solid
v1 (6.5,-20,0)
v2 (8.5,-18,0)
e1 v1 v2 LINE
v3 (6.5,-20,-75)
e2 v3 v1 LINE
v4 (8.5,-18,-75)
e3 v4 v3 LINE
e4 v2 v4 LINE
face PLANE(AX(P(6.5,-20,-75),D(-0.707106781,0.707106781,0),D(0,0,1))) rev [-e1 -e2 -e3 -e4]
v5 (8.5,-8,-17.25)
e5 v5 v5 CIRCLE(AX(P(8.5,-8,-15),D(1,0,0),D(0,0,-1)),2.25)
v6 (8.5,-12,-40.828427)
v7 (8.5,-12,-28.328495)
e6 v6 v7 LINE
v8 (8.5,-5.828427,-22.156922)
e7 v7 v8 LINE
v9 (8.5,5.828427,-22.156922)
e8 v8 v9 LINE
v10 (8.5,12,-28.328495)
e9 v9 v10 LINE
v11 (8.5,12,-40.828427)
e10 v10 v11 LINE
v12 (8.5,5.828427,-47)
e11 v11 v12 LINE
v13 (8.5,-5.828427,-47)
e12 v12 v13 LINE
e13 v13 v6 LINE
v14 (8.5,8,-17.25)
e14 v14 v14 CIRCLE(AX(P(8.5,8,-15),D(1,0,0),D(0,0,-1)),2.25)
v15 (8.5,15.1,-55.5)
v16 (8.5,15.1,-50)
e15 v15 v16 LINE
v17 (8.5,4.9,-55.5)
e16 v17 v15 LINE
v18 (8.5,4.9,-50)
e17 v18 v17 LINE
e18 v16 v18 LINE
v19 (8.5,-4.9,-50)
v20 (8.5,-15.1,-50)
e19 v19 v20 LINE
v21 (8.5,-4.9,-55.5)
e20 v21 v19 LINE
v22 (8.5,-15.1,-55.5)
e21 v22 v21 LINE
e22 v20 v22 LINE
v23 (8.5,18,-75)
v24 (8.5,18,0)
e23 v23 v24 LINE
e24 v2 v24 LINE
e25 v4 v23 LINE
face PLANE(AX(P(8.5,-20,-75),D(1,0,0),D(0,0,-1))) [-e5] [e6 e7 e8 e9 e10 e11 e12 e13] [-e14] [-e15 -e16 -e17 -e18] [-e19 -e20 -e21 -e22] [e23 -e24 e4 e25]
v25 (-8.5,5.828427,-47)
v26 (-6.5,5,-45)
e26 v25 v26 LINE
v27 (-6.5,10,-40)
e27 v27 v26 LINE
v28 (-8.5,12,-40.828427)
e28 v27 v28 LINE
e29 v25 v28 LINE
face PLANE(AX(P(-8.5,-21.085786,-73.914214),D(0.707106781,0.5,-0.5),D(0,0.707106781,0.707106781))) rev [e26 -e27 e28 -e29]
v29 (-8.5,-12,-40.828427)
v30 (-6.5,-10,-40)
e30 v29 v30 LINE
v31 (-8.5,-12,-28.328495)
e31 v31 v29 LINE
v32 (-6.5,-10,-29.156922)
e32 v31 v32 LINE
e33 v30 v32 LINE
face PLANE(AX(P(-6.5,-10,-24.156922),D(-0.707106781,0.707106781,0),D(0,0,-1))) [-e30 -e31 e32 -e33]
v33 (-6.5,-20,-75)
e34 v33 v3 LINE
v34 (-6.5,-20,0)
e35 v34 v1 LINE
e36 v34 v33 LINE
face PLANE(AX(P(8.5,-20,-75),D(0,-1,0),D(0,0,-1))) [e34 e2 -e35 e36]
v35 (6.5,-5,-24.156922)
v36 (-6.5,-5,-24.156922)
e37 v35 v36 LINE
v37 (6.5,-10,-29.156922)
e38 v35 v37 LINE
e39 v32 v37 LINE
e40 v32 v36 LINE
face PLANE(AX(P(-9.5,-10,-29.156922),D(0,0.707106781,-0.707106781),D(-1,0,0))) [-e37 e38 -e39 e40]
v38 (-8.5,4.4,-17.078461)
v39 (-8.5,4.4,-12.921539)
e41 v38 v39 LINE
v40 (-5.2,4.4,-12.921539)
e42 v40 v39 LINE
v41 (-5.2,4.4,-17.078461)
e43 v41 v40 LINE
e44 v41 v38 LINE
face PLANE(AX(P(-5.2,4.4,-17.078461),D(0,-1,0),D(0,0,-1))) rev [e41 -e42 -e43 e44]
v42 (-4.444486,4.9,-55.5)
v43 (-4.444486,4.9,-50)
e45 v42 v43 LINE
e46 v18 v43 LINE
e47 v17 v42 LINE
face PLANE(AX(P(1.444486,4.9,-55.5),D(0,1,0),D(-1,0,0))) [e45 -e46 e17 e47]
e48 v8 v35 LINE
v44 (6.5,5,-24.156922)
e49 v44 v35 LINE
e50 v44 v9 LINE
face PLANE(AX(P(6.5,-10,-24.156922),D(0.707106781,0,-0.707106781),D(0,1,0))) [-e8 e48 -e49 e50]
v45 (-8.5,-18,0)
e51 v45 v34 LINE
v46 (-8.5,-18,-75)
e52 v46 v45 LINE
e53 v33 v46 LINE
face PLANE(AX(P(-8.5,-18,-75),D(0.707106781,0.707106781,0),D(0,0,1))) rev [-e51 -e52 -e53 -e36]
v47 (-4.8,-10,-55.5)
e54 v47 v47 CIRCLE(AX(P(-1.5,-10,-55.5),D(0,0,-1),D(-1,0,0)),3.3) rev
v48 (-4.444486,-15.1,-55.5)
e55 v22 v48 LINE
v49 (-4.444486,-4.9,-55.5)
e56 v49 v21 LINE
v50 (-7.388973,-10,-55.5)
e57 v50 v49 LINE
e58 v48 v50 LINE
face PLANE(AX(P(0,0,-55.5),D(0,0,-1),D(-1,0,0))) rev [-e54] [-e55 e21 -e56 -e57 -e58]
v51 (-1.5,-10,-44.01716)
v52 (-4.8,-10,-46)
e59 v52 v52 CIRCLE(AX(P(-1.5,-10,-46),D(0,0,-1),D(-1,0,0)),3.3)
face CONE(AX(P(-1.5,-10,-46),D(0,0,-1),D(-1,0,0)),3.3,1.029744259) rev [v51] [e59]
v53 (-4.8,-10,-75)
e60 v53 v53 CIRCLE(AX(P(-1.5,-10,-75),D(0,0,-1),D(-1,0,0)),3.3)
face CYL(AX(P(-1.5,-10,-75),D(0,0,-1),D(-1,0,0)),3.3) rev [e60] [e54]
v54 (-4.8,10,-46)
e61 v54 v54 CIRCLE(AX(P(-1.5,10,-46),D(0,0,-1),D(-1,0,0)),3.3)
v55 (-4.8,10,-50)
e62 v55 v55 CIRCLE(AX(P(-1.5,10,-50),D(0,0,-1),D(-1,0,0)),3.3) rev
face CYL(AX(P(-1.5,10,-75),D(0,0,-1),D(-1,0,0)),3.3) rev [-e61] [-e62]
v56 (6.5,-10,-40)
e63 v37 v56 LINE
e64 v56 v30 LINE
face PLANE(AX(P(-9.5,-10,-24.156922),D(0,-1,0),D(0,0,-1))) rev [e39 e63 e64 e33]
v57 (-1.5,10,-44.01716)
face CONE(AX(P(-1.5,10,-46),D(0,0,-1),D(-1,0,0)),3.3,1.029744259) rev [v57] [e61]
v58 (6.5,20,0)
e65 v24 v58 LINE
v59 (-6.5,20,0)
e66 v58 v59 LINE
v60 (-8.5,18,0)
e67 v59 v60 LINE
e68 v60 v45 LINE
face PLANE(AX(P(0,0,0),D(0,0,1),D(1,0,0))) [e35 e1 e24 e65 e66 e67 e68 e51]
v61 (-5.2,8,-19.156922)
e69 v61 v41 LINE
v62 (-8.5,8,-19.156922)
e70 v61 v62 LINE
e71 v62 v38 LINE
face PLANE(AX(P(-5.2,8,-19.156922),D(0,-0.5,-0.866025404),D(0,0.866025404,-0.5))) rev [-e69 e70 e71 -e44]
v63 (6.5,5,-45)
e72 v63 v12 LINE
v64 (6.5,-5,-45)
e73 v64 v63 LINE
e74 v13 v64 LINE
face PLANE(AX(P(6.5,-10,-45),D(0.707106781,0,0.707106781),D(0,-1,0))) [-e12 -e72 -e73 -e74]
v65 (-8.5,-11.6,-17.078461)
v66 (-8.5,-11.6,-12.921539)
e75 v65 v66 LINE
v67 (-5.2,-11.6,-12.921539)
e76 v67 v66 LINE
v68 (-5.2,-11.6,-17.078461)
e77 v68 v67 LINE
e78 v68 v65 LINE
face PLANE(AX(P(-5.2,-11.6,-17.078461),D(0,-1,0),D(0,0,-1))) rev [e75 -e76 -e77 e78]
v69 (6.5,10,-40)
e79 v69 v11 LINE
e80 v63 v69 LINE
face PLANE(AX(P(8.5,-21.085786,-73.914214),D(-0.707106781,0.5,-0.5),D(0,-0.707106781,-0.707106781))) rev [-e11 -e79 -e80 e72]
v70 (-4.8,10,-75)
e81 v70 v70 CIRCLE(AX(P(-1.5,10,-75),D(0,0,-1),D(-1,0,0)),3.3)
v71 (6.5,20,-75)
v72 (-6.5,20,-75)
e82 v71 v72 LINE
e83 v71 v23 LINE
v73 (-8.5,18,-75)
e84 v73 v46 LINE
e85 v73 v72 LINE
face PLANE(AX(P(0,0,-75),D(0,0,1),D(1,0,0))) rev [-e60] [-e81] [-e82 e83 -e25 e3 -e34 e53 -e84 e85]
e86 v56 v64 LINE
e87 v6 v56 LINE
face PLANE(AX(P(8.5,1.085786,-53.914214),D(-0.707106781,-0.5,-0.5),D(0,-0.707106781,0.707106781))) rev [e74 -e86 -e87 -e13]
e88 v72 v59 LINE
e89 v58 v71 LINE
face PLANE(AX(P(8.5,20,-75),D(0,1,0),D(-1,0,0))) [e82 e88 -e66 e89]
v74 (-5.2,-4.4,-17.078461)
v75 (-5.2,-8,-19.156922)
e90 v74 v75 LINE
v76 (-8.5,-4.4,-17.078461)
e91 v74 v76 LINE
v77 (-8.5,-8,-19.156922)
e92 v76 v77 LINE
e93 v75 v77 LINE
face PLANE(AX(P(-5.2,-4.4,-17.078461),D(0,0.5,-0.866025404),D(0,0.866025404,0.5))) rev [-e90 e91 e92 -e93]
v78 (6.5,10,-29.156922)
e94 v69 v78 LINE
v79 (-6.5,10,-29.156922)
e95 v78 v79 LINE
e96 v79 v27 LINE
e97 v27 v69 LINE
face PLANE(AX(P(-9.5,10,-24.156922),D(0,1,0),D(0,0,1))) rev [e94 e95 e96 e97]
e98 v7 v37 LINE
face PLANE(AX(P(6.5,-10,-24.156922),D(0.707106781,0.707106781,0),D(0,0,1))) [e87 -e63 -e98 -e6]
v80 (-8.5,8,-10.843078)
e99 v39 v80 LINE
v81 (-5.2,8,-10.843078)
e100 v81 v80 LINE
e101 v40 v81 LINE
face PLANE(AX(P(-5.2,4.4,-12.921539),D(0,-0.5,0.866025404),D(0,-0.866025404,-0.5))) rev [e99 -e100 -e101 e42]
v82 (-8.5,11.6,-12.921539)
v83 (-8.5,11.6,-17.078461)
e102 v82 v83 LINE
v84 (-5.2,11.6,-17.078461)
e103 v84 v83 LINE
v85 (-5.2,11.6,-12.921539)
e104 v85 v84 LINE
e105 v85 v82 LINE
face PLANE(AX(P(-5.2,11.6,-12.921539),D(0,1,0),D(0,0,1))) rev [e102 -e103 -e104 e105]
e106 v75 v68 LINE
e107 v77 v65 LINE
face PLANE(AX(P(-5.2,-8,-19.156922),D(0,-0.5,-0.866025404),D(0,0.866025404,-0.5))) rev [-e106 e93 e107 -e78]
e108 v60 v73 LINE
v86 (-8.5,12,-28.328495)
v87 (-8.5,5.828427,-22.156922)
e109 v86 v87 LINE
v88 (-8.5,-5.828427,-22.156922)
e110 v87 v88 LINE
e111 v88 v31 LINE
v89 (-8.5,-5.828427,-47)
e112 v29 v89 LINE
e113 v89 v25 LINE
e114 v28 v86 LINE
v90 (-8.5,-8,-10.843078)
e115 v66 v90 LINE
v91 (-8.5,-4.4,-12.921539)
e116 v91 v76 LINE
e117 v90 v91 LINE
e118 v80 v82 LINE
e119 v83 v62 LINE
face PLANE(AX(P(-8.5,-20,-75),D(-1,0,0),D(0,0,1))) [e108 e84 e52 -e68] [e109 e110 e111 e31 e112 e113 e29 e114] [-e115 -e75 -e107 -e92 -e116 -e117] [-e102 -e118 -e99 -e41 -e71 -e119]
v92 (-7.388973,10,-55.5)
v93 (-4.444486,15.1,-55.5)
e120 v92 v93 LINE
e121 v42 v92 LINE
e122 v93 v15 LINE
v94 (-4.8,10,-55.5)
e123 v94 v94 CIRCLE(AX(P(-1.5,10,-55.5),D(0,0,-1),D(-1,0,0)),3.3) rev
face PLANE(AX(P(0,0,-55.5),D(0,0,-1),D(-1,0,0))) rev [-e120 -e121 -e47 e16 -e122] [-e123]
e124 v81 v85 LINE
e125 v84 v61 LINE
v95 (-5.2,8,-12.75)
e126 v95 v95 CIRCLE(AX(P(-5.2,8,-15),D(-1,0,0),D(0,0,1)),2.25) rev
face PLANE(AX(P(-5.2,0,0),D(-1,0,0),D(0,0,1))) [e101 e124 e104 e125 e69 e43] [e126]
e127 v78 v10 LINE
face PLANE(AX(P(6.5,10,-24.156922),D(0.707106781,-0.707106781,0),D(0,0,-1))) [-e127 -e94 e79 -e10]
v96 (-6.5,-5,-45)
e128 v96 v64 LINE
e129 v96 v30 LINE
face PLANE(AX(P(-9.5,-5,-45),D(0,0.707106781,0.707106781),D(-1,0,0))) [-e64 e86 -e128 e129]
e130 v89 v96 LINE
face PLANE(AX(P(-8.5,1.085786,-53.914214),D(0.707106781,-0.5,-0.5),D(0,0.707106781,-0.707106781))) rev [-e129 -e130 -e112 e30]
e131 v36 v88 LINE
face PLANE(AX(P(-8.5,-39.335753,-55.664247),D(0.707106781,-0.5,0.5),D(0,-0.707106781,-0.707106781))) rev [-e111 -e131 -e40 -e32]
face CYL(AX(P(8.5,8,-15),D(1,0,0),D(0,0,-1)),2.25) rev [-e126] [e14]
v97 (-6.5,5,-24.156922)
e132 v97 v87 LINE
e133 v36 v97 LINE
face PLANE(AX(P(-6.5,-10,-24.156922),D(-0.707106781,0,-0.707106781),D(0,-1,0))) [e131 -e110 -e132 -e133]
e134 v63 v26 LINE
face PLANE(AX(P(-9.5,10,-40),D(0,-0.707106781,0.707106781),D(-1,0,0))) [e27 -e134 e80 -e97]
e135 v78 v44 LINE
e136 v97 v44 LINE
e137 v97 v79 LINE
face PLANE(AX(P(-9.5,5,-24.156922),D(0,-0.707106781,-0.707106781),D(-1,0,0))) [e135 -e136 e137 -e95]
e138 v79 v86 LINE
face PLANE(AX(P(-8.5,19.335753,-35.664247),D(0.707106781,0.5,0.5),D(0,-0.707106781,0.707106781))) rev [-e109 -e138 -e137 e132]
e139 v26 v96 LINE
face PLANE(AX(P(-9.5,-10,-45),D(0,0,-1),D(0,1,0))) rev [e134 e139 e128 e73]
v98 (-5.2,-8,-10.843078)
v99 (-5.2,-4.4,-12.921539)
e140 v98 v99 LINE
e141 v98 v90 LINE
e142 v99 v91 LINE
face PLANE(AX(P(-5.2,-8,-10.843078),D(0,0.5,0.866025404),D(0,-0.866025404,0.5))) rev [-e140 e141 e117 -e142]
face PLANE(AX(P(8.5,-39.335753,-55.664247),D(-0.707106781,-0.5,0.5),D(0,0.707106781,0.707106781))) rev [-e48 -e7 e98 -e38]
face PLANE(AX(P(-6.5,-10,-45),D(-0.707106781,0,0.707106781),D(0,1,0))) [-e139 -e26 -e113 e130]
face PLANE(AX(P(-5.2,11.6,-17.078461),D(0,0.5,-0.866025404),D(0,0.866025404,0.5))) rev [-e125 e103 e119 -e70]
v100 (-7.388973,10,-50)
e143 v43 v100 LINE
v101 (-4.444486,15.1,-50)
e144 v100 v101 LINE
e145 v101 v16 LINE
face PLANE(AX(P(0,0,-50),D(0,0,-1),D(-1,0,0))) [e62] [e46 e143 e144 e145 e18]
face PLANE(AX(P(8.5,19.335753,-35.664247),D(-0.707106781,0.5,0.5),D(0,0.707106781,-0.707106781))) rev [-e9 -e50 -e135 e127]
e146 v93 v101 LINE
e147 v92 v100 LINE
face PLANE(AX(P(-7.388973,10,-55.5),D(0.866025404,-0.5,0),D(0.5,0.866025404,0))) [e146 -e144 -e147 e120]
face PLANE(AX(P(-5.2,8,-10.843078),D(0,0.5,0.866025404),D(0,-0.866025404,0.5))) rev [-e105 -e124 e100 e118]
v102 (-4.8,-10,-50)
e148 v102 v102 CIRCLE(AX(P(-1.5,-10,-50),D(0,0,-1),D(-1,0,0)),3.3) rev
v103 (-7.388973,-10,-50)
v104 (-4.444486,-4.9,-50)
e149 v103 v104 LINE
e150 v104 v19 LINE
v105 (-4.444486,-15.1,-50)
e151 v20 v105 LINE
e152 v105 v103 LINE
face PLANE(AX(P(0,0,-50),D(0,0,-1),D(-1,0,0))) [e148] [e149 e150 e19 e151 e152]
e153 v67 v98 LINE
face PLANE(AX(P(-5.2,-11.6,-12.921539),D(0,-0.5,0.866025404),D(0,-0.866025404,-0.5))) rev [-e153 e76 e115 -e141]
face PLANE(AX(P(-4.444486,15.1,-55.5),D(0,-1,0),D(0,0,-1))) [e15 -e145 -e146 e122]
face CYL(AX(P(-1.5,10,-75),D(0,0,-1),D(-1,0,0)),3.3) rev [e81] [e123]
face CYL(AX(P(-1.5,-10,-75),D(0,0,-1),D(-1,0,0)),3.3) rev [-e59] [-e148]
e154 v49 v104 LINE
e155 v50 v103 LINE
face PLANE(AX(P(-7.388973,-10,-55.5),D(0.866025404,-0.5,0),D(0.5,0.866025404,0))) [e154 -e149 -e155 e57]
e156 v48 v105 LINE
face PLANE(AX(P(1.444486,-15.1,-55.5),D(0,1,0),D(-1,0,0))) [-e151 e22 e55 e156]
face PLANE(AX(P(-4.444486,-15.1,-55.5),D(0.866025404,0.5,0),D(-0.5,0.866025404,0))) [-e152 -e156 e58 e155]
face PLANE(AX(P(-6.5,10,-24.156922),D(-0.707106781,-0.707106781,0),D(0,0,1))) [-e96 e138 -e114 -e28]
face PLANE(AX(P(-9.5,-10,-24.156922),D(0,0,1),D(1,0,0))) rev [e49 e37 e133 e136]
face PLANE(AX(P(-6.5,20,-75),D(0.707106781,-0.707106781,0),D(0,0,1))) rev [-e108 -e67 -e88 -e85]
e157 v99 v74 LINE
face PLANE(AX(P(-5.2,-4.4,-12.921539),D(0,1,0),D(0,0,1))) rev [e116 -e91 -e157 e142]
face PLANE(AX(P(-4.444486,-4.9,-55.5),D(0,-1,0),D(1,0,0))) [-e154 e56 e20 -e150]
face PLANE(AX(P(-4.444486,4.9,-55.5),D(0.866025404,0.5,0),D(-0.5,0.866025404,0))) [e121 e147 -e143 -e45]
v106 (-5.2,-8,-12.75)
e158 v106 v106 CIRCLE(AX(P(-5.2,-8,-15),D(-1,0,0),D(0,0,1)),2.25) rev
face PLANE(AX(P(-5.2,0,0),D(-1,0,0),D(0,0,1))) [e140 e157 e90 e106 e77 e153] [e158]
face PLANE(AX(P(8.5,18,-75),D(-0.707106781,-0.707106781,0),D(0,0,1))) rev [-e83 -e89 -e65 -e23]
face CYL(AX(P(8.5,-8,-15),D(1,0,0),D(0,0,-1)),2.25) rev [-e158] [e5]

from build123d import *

# Parameters (mm, degrees)
SKETCH1_W                = 17
SKETCH1_H                = 40
BOSS_EXTRUDE1_DEPTH      = 75
M4_CLEARANCE_HOLE1_D     = 4.5
M4_CLEARANCE_HOLE1_DEPTH = 15
M4_CLEARANCE_HOLE1_TIP   = 1.351936393
CUT_EXTRUDE1_DEPTH       = 3.3
M6_CLEARANCE_HOLE1_D     = 6.6
M6_CLEARANCE_HOLE1_DEPTH = 29
M6_CLEARANCE_HOLE1_TIP   = 1.982840043
CUT_EXTRUDE2_START       = -25
CUT_EXTRUDE2_DEPTH       = 5.5
SKETCH11_W               = 5.5
SKETCH11_H               = 10.2
CUT_EXTRUDE3_DEPTH       = 10
CHAMFER1_START           = -8.5
CHAMFER1_DEPTH           = 17
CHAMFER2_SIZE            = 2
CHAMFER3_SIZE            = 2


with BuildPart() as part:
    # Sketch1 → Boss-Extrude1 (new body)
    with BuildSketch(Plane.XY):
        Rectangle(SKETCH1_W, SKETCH1_H)
    extrude(amount=-BOSS_EXTRUDE1_DEPTH)

    # M4 Clearance Hole1
    with Locations(Plane(origin=(8.5, 0, 0), x_dir=(0, 0, -1), z_dir=(1, 0, 0))):
        with Locations((15, 8), (15, -8)):
            Hole(M4_CLEARANCE_HOLE1_D / 2, depth=M4_CLEARANCE_HOLE1_DEPTH)
            with Locations((0, 0, -(M4_CLEARANCE_HOLE1_DEPTH + M4_CLEARANCE_HOLE1_TIP / 2))):  # 118° drill point
                Cone(0, M4_CLEARANCE_HOLE1_D / 2, M4_CLEARANCE_HOLE1_TIP, mode=Mode.SUBTRACT)

    # Sketch6 → Cut-Extrude1 (cut)
    with BuildSketch(Plane.ZY.offset(8.5)):
        Polygon((-10.843078062, 8), (-12.921539031, 11.6), (-17.078460969, 11.6), (-19.156921938, 8), (-17.078460969, 4.4), (-12.921539031, 4.4), align=None)
        Polygon((-10.843078062, -8), (-12.921539031, -4.4), (-17.078460969, -4.4), (-19.156921938, -8), (-17.078460969, -11.6), (-12.921539031, -11.6), align=None)
    extrude(amount=-CUT_EXTRUDE1_DEPTH, mode=Mode.SUBTRACT)

    # M6 Clearance Hole1
    with Locations(Plane(origin=(0, 0, -75), x_dir=(-1, 0, 0), z_dir=(0, 0, -1))):
        with Locations((1.5, -10), (1.5, 10)):
            Hole(M6_CLEARANCE_HOLE1_D / 2, depth=M6_CLEARANCE_HOLE1_DEPTH)
            with Locations((0, 0, -(M6_CLEARANCE_HOLE1_DEPTH + M6_CLEARANCE_HOLE1_TIP / 2))):  # 118° drill point
                Cone(0, M6_CLEARANCE_HOLE1_D / 2, M6_CLEARANCE_HOLE1_TIP, mode=Mode.SUBTRACT)

    # Sketch10 → Cut-Extrude2 (cut)
    with BuildSketch(Plane(origin=(0, 0, -75), x_dir=(-1, 0, 0), z_dir=(0, 0, -1)).offset(CUT_EXTRUDE2_START)):
        Polygon((7.388972746, 10), (4.444486373, 15.1), (-1.444486373, 15.1), (-4.388972746, 10), (-1.444486373, 4.9), (4.444486373, 4.9), align=None)
        Polygon((7.388972746, -10), (4.444486373, -4.9), (-1.444486373, -4.9), (-4.388972746, -10), (-1.444486373, -15.1), (4.444486373, -15.1), align=None)
    extrude(amount=CUT_EXTRUDE2_DEPTH, mode=Mode.SUBTRACT)

    # Sketch11 → Cut-Extrude3 (cut)
    with BuildSketch(Plane(origin=(8.5, 0, 0), x_dir=(0, 0, -1), z_dir=(1, 0, 0))):
        with Locations((52.75, 10)):
            Rectangle(SKETCH11_W, SKETCH11_H)
        with Locations((52.75, -10)):
            Rectangle(SKETCH11_W, SKETCH11_H)
    extrude(amount=-CUT_EXTRUDE3_DEPTH, mode=Mode.SUBTRACT)

    # Chamfer1: read off the stored shape, not the designer's step
    # Chamfer1 outline → Chamfer1 (cut)
    with BuildSketch(Plane.YZ.offset(CHAMFER1_START)):
        Polygon((-5, -24.156921938), (-10, -29.156921938), (-10, -40), (-5, -45), (5, -45), (10, -40), (10, -29.156921938), (5, -24.156921938), align=None)
    extrude(amount=CHAMFER1_DEPTH, mode=Mode.SUBTRACT)

    # Chamfer2
    chamfer2_edges = [part.edges().sort_by_distance(p)[0] for p in [
        (-8.5, 20, -37.5),
        (8.5, 20, -37.5),
        (8.5, -20, -37.5),
        (-8.5, -20, -37.5),
    ]]
    chamfer(chamfer2_edges, length=CHAMFER2_SIZE)

    # Chamfer3
    chamfer3_edges = [part.edges().sort_by_distance(p)[0] for p in [
        (-8.5, -10, -34.578460969),
        (8.5, -10, -34.578460969),
        (-8.5, 0, -24.156921938),
        (8.5, 0, -24.156921938),
        (-8.5, 10, -34.578460969),
        (8.5, 10, -34.578460969),
        (-8.5, 0, -45),
        (8.5, 0, -45),
        (8.5, -7.5, -26.656921938),
        (-8.5, -7.5, -26.656921938),
        (8.5, 7.5, -26.656921938),
        (-8.5, 7.5, -26.656921938),
        (8.5, 7.5, -42.5),
        (-8.5, 7.5, -42.5),
        (8.5, -7.5, -42.5),
        (-8.5, -7.5, -42.5),
    ]]
    chamfer(chamfer3_edges, length=CHAMFER3_SIZE)


solid = part.part
